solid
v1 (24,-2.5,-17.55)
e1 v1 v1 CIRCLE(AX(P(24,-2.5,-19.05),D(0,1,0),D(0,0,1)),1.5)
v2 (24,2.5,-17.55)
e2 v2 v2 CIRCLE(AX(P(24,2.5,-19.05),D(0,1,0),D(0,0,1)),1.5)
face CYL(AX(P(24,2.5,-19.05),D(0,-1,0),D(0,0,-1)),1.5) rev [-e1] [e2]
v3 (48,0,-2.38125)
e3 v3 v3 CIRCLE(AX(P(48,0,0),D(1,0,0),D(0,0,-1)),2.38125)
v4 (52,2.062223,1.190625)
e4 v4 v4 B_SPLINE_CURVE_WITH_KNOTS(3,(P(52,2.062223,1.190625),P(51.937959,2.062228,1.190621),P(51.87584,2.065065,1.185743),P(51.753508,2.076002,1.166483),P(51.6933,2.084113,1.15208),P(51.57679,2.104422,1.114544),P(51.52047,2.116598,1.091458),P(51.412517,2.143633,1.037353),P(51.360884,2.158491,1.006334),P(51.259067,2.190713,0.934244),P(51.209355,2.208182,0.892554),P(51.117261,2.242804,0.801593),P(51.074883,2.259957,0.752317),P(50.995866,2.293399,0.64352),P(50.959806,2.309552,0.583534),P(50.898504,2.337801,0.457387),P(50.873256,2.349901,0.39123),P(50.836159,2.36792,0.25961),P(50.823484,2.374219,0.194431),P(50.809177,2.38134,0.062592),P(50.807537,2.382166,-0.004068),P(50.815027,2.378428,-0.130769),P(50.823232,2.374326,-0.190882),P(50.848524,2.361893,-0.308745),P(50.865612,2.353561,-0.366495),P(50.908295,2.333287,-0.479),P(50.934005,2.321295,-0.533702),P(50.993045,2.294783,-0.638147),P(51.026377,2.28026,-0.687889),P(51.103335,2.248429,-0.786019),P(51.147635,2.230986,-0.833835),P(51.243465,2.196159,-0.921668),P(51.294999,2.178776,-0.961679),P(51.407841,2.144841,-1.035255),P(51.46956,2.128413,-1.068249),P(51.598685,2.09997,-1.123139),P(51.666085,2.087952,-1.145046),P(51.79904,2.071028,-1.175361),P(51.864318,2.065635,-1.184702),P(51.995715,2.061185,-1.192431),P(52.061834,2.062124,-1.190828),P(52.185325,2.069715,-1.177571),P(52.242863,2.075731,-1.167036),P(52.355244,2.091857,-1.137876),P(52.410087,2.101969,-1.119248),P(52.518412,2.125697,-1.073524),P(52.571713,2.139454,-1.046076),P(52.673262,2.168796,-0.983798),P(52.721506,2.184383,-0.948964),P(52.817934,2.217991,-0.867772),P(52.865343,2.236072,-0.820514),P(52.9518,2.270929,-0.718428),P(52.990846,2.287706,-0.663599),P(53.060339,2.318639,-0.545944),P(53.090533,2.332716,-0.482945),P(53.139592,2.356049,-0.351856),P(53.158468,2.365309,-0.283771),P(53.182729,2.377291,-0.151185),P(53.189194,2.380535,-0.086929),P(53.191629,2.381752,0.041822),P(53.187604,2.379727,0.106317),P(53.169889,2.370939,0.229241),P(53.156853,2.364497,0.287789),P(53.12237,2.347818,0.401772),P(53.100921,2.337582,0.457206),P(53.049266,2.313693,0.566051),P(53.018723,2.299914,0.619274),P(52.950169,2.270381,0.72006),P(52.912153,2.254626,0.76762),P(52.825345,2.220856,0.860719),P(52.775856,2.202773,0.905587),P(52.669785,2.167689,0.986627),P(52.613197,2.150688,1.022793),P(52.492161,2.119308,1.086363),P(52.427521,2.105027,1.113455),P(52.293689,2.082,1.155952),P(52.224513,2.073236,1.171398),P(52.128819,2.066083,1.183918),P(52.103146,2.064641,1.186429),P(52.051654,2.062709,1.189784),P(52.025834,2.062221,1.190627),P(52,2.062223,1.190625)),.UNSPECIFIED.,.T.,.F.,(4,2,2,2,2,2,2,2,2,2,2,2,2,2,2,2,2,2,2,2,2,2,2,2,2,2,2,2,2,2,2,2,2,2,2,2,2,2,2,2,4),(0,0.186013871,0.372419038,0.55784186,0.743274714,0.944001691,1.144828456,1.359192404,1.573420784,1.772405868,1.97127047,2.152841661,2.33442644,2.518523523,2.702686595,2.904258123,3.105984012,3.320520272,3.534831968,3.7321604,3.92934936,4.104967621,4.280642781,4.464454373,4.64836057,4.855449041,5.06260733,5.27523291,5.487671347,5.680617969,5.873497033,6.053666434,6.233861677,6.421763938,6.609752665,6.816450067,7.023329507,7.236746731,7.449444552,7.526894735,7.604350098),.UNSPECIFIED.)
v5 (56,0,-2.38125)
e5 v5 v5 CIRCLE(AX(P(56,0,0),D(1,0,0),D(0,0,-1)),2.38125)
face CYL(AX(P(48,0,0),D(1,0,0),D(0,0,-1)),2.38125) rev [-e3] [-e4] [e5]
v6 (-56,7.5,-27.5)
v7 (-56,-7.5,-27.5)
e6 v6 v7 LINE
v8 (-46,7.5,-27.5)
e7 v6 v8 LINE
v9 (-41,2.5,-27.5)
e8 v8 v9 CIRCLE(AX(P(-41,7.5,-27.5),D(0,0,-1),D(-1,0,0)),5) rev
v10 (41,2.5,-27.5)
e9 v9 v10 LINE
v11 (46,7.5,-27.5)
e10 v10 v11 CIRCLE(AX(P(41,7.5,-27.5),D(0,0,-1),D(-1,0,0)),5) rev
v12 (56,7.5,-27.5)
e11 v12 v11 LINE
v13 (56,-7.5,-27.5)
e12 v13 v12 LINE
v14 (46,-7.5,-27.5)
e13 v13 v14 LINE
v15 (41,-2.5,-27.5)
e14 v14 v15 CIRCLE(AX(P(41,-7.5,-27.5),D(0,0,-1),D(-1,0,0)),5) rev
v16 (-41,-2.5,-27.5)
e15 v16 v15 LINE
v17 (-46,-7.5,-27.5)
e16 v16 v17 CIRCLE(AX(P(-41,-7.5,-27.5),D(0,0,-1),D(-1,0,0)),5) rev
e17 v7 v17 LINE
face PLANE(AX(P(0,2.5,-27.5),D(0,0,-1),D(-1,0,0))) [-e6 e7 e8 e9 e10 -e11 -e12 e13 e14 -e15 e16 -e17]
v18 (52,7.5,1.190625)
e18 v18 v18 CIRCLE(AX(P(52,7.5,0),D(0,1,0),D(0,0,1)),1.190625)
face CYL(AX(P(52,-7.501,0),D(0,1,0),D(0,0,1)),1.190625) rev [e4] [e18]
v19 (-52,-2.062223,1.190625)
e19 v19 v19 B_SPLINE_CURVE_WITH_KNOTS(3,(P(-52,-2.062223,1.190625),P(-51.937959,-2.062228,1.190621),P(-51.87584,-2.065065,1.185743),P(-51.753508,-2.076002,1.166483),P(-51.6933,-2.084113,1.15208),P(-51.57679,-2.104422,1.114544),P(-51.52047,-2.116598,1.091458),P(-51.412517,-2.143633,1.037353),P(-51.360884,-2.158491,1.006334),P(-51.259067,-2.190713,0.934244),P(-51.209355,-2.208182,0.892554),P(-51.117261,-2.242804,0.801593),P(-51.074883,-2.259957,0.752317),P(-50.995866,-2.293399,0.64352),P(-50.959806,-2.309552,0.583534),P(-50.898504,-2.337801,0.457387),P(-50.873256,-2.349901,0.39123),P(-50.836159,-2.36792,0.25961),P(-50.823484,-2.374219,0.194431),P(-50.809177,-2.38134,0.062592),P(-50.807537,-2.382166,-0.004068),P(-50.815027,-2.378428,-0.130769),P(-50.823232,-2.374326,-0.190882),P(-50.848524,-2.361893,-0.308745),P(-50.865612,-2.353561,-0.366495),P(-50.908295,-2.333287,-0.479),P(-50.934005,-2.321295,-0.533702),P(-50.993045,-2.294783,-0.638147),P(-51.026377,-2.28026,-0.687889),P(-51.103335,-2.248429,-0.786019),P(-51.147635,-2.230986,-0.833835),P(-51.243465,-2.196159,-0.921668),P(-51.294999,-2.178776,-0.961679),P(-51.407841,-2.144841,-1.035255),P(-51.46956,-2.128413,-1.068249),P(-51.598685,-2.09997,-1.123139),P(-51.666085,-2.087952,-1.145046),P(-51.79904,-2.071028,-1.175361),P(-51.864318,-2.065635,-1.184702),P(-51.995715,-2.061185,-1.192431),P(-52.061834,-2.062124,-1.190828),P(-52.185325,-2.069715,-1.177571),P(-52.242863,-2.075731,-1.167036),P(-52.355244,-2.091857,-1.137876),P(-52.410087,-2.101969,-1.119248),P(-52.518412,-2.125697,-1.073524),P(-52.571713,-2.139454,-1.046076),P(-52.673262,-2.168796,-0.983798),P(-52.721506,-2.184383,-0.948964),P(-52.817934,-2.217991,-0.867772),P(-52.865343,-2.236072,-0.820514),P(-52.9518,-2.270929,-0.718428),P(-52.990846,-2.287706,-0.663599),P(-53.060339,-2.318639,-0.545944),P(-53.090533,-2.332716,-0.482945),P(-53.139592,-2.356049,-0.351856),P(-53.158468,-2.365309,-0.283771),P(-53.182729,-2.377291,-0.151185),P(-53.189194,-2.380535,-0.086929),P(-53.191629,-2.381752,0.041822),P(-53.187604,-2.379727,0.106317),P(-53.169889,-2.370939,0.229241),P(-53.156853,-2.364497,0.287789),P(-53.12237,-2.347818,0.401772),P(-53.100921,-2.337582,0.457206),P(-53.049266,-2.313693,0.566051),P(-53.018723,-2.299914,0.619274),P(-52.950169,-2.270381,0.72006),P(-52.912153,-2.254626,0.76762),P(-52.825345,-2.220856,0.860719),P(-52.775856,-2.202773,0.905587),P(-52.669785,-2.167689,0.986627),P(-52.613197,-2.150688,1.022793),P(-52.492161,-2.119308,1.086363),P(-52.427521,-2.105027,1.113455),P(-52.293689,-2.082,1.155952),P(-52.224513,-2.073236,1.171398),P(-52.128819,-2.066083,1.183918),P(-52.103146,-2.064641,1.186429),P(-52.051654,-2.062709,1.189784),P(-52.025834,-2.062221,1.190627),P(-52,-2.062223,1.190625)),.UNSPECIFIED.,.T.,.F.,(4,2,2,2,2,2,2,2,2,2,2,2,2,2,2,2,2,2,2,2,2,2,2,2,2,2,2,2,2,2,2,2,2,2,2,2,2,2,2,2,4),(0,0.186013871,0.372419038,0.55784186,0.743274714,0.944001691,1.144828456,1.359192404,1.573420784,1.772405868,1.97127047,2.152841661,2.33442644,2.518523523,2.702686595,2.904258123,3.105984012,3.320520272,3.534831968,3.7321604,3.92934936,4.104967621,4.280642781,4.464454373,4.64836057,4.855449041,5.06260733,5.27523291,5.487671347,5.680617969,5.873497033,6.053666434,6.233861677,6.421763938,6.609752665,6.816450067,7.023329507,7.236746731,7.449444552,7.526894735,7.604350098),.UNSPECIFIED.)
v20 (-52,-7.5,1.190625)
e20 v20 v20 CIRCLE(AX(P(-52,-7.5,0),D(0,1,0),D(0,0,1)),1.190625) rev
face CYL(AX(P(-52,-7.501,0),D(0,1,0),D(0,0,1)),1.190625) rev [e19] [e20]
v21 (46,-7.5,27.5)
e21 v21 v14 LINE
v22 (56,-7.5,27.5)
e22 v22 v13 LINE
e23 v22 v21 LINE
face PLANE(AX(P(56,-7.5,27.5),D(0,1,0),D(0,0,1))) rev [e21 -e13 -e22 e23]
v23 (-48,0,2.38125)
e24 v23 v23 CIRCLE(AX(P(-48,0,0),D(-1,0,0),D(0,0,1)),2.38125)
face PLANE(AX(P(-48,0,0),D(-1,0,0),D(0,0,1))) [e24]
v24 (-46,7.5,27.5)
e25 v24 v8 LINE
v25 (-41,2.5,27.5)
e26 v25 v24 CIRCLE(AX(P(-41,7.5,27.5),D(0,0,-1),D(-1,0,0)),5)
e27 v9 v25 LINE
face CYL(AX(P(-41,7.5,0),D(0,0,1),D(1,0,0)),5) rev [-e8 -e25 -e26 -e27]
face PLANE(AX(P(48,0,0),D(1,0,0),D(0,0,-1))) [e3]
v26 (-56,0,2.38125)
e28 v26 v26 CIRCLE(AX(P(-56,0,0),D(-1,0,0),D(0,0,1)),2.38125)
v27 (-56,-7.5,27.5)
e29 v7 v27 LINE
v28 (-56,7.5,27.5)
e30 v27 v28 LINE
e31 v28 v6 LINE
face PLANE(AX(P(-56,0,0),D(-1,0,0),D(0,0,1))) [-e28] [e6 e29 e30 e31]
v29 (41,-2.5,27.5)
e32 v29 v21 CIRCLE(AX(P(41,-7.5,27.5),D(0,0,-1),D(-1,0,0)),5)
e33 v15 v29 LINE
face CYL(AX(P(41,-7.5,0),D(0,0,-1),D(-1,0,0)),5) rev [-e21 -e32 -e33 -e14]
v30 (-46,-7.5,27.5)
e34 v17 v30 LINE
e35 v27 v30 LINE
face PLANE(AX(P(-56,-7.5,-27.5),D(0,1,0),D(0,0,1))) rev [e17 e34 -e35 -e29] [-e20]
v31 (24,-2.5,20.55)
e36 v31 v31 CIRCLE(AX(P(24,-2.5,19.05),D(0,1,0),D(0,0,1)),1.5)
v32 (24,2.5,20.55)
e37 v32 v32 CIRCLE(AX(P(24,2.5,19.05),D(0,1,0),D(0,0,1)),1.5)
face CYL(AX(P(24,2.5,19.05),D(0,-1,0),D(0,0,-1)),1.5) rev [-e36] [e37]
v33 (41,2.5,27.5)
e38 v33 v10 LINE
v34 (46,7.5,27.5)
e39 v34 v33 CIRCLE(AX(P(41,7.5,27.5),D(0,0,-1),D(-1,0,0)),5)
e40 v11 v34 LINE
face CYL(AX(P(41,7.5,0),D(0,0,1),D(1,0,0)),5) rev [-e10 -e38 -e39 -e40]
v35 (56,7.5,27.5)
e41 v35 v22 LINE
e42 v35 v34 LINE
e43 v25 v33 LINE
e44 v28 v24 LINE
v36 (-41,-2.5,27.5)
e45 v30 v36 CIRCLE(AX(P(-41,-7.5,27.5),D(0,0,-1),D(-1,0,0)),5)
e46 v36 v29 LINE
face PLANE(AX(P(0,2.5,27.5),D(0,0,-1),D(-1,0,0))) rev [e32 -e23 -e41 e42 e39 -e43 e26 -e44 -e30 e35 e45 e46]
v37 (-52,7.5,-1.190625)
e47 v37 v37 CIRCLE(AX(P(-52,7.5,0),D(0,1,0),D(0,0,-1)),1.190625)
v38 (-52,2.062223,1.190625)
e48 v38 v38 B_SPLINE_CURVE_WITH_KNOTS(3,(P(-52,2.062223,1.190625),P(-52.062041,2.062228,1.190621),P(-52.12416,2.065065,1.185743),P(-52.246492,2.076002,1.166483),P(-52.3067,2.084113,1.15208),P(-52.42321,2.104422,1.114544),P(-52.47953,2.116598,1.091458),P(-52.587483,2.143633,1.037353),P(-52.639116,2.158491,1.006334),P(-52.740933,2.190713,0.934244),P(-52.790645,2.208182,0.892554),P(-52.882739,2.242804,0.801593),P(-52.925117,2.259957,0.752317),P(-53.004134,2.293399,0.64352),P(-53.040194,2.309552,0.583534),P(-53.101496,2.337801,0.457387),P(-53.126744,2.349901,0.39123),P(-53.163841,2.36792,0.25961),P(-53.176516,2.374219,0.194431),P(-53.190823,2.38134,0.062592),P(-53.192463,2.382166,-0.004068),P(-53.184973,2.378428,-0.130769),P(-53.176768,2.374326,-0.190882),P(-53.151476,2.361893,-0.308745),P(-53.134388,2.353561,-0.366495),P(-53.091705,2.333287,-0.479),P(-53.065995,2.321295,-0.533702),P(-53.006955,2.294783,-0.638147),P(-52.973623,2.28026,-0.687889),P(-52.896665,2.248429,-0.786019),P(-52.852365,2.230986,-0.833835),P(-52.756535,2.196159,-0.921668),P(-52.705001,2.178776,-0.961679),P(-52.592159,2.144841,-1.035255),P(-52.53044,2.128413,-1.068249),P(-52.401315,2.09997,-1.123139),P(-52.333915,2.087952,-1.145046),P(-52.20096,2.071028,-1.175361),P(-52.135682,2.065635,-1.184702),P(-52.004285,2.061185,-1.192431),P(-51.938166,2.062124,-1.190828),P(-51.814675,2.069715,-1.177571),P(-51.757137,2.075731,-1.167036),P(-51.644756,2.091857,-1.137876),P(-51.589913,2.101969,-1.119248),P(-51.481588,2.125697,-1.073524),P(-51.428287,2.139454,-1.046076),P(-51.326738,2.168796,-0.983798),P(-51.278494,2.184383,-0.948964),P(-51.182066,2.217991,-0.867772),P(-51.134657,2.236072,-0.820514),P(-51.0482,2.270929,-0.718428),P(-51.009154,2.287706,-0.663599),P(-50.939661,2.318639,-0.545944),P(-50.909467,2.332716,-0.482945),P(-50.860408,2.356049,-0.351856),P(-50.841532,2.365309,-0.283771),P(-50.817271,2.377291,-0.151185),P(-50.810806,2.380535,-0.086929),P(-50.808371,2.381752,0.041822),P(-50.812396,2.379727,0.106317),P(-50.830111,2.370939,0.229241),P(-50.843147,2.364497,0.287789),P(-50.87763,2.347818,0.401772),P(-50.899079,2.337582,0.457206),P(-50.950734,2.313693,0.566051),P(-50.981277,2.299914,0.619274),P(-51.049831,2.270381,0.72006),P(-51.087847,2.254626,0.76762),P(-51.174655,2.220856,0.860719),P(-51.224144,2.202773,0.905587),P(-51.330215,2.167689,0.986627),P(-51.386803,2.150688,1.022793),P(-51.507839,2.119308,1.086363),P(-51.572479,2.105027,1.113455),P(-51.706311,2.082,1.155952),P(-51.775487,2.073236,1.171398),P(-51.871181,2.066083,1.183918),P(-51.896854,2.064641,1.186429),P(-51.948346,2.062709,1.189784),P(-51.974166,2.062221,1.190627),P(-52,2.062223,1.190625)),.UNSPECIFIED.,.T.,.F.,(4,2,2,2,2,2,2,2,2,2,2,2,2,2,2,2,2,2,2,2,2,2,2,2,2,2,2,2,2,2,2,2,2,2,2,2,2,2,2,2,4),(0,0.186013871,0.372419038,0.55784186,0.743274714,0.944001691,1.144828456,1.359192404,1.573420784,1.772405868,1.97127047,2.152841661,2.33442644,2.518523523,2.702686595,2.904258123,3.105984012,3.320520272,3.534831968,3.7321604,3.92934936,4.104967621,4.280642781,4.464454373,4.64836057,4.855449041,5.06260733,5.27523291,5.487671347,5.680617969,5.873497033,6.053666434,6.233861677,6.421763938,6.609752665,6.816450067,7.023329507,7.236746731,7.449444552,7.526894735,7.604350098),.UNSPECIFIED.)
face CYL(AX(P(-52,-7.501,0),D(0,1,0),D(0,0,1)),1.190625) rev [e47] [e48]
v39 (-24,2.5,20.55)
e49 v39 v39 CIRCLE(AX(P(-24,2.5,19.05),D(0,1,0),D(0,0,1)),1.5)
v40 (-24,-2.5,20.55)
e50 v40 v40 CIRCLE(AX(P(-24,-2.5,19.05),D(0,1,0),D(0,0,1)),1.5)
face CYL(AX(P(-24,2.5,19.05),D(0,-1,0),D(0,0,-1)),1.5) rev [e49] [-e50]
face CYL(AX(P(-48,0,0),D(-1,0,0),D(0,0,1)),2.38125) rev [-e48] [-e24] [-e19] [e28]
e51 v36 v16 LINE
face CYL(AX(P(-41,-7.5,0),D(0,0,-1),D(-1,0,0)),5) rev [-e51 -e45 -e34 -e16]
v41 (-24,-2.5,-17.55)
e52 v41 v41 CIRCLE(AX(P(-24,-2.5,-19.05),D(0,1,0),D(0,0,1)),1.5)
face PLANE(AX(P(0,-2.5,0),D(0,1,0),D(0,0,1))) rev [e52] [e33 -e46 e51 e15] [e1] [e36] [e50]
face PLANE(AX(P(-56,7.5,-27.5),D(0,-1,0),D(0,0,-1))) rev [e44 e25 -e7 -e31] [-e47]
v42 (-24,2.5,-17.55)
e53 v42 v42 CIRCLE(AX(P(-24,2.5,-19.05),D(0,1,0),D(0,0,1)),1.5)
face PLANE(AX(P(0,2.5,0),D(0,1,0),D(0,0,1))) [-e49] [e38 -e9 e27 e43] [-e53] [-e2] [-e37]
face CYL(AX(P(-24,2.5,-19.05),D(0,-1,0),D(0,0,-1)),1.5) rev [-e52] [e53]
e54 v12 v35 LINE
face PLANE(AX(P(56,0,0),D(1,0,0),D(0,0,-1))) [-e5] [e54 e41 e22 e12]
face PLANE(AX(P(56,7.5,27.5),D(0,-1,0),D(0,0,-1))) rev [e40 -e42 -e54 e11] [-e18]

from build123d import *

# Parameters (mm, degrees)
SKETCH1_W           = 92
SKETCH1_H           = 55
SKETCH1_R           = 1.5
BOSS_EXTRUDE3_DEPTH = 2.5
SKETCH4_W           = 55
SKETCH4_H           = 15
BOSS_EXTRUDE4_DEPTH = 10
SKETCH5_W           = 55
SKETCH5_H           = 15
BOSS_EXTRUDE5_DEPTH = 10
SKETCH6_R           = 2.38125
CUT_EXTRUDE1_DEPTH  = 8
CUT_EXTRUDE2_REACH  = 66.166
SKETCH7_R           = 1.190625
CUT_EXTRUDE4_START  = -8
SKETCH8_R           = 2.38125
CUT_EXTRUDE4_DEPTH  = 8
FILLET1_R           = 5


with BuildPart() as part:
    # Sketch1 → Boss-Extrude3 (new, symmetric)
    with BuildSketch(Plane(origin=(0, 0, 0), x_dir=(1, 0, 0), z_dir=(0, 1, 0))):
        Rectangle(SKETCH1_W, SKETCH1_H)
        with Locations(Location((-24, 19.05, 0), (0, 0, 270))):
            Circle(SKETCH1_R, mode=Mode.SUBTRACT)
        with Locations(Location((24, 19.05, 0), (0, 0, 270))):
            Circle(SKETCH1_R, mode=Mode.SUBTRACT)
        with Locations(Location((-24, -19.05, 0), (0, 0, 270))):
            Circle(SKETCH1_R, mode=Mode.SUBTRACT)
        with Locations(Location((24, -19.05, 0), (0, 0, 270))):
            Circle(SKETCH1_R, mode=Mode.SUBTRACT)
    extrude(amount=BOSS_EXTRUDE3_DEPTH, both=True)

    # Sketch4 → Boss-Extrude4 (add)
    with BuildSketch(Plane(origin=(46, 0, 0), x_dir=(0, 0, -1), z_dir=(1, 0, 0))):
        Rectangle(SKETCH4_W, SKETCH4_H)
    extrude(amount=BOSS_EXTRUDE4_DEPTH)

    # Sketch5 → Boss-Extrude5 (add)
    with BuildSketch(Plane.ZY.offset(46)):
        Rectangle(SKETCH5_W, SKETCH5_H)
    extrude(amount=BOSS_EXTRUDE5_DEPTH)

    # Sketch6 → Cut-Extrude1 (cut)
    with BuildSketch(Plane(origin=(56, 0, 0), x_dir=(0, 0, -1), z_dir=(1, 0, 0))):
        Circle(SKETCH6_R)
    extrude(amount=-CUT_EXTRUDE1_DEPTH, mode=Mode.SUBTRACT)

    # Sketch7 → Cut-Extrude2 (cut, up to next)
    with BuildSketch(Plane(origin=(0, 7.5, 0), x_dir=(1, 0, 0), z_dir=(0, 1, 0)), mode=Mode.PRIVATE) as cut_extrude2_sk1:
        with Locations(Location((52, 0, 0), (0, 0, 270))):
            Circle(SKETCH7_R)
    cut_extrude2_tool1 = extrude(cut_extrude2_sk1.sketch, amount=-CUT_EXTRUDE2_REACH, mode=Mode.PRIVATE) & part.part
    # Sketch7 → Cut-Extrude2 (cut, up to next)
    with BuildSketch(Plane(origin=(0, 7.5, 0), x_dir=(1, 0, 0), z_dir=(0, 1, 0)), mode=Mode.PRIVATE) as cut_extrude2_sk2:
        with Locations(Location((-52, 0, 0), (0, 0, 270))):
            Circle(SKETCH7_R)
    cut_extrude2_tool2 = extrude(cut_extrude2_sk2.sketch, amount=-CUT_EXTRUDE2_REACH, mode=Mode.PRIVATE) & part.part
    add(cut_extrude2_tool1.solids().sort_by_distance((52, 7.5, 0))[0], mode=Mode.SUBTRACT)
    add(cut_extrude2_tool2.solids().sort_by_distance((-52, 7.5, 0))[0], mode=Mode.SUBTRACT)

    # Sketch8 → Cut-Extrude4 (cut)
    with BuildSketch(Plane.ZY.offset(56).offset(CUT_EXTRUDE4_START)):
        with Locations(Location((0, 0, 0), (0, 0, 180))):
            Circle(SKETCH8_R)
    extrude(amount=CUT_EXTRUDE4_DEPTH, mode=Mode.SUBTRACT)

    # Fillet1
    fillet1_edges = [part.edges().sort_by_distance(p)[0] for p in [
        (-46, -2.5, 0),
        (46, -2.5, 0),
        (46, 2.5, 0),
        (-46, 2.5, 0),
    ]]
    fillet(fillet1_edges, radius=FILLET1_R - 0.0001)  # a hair under: the kernel refuses the full size


solid = part.part
